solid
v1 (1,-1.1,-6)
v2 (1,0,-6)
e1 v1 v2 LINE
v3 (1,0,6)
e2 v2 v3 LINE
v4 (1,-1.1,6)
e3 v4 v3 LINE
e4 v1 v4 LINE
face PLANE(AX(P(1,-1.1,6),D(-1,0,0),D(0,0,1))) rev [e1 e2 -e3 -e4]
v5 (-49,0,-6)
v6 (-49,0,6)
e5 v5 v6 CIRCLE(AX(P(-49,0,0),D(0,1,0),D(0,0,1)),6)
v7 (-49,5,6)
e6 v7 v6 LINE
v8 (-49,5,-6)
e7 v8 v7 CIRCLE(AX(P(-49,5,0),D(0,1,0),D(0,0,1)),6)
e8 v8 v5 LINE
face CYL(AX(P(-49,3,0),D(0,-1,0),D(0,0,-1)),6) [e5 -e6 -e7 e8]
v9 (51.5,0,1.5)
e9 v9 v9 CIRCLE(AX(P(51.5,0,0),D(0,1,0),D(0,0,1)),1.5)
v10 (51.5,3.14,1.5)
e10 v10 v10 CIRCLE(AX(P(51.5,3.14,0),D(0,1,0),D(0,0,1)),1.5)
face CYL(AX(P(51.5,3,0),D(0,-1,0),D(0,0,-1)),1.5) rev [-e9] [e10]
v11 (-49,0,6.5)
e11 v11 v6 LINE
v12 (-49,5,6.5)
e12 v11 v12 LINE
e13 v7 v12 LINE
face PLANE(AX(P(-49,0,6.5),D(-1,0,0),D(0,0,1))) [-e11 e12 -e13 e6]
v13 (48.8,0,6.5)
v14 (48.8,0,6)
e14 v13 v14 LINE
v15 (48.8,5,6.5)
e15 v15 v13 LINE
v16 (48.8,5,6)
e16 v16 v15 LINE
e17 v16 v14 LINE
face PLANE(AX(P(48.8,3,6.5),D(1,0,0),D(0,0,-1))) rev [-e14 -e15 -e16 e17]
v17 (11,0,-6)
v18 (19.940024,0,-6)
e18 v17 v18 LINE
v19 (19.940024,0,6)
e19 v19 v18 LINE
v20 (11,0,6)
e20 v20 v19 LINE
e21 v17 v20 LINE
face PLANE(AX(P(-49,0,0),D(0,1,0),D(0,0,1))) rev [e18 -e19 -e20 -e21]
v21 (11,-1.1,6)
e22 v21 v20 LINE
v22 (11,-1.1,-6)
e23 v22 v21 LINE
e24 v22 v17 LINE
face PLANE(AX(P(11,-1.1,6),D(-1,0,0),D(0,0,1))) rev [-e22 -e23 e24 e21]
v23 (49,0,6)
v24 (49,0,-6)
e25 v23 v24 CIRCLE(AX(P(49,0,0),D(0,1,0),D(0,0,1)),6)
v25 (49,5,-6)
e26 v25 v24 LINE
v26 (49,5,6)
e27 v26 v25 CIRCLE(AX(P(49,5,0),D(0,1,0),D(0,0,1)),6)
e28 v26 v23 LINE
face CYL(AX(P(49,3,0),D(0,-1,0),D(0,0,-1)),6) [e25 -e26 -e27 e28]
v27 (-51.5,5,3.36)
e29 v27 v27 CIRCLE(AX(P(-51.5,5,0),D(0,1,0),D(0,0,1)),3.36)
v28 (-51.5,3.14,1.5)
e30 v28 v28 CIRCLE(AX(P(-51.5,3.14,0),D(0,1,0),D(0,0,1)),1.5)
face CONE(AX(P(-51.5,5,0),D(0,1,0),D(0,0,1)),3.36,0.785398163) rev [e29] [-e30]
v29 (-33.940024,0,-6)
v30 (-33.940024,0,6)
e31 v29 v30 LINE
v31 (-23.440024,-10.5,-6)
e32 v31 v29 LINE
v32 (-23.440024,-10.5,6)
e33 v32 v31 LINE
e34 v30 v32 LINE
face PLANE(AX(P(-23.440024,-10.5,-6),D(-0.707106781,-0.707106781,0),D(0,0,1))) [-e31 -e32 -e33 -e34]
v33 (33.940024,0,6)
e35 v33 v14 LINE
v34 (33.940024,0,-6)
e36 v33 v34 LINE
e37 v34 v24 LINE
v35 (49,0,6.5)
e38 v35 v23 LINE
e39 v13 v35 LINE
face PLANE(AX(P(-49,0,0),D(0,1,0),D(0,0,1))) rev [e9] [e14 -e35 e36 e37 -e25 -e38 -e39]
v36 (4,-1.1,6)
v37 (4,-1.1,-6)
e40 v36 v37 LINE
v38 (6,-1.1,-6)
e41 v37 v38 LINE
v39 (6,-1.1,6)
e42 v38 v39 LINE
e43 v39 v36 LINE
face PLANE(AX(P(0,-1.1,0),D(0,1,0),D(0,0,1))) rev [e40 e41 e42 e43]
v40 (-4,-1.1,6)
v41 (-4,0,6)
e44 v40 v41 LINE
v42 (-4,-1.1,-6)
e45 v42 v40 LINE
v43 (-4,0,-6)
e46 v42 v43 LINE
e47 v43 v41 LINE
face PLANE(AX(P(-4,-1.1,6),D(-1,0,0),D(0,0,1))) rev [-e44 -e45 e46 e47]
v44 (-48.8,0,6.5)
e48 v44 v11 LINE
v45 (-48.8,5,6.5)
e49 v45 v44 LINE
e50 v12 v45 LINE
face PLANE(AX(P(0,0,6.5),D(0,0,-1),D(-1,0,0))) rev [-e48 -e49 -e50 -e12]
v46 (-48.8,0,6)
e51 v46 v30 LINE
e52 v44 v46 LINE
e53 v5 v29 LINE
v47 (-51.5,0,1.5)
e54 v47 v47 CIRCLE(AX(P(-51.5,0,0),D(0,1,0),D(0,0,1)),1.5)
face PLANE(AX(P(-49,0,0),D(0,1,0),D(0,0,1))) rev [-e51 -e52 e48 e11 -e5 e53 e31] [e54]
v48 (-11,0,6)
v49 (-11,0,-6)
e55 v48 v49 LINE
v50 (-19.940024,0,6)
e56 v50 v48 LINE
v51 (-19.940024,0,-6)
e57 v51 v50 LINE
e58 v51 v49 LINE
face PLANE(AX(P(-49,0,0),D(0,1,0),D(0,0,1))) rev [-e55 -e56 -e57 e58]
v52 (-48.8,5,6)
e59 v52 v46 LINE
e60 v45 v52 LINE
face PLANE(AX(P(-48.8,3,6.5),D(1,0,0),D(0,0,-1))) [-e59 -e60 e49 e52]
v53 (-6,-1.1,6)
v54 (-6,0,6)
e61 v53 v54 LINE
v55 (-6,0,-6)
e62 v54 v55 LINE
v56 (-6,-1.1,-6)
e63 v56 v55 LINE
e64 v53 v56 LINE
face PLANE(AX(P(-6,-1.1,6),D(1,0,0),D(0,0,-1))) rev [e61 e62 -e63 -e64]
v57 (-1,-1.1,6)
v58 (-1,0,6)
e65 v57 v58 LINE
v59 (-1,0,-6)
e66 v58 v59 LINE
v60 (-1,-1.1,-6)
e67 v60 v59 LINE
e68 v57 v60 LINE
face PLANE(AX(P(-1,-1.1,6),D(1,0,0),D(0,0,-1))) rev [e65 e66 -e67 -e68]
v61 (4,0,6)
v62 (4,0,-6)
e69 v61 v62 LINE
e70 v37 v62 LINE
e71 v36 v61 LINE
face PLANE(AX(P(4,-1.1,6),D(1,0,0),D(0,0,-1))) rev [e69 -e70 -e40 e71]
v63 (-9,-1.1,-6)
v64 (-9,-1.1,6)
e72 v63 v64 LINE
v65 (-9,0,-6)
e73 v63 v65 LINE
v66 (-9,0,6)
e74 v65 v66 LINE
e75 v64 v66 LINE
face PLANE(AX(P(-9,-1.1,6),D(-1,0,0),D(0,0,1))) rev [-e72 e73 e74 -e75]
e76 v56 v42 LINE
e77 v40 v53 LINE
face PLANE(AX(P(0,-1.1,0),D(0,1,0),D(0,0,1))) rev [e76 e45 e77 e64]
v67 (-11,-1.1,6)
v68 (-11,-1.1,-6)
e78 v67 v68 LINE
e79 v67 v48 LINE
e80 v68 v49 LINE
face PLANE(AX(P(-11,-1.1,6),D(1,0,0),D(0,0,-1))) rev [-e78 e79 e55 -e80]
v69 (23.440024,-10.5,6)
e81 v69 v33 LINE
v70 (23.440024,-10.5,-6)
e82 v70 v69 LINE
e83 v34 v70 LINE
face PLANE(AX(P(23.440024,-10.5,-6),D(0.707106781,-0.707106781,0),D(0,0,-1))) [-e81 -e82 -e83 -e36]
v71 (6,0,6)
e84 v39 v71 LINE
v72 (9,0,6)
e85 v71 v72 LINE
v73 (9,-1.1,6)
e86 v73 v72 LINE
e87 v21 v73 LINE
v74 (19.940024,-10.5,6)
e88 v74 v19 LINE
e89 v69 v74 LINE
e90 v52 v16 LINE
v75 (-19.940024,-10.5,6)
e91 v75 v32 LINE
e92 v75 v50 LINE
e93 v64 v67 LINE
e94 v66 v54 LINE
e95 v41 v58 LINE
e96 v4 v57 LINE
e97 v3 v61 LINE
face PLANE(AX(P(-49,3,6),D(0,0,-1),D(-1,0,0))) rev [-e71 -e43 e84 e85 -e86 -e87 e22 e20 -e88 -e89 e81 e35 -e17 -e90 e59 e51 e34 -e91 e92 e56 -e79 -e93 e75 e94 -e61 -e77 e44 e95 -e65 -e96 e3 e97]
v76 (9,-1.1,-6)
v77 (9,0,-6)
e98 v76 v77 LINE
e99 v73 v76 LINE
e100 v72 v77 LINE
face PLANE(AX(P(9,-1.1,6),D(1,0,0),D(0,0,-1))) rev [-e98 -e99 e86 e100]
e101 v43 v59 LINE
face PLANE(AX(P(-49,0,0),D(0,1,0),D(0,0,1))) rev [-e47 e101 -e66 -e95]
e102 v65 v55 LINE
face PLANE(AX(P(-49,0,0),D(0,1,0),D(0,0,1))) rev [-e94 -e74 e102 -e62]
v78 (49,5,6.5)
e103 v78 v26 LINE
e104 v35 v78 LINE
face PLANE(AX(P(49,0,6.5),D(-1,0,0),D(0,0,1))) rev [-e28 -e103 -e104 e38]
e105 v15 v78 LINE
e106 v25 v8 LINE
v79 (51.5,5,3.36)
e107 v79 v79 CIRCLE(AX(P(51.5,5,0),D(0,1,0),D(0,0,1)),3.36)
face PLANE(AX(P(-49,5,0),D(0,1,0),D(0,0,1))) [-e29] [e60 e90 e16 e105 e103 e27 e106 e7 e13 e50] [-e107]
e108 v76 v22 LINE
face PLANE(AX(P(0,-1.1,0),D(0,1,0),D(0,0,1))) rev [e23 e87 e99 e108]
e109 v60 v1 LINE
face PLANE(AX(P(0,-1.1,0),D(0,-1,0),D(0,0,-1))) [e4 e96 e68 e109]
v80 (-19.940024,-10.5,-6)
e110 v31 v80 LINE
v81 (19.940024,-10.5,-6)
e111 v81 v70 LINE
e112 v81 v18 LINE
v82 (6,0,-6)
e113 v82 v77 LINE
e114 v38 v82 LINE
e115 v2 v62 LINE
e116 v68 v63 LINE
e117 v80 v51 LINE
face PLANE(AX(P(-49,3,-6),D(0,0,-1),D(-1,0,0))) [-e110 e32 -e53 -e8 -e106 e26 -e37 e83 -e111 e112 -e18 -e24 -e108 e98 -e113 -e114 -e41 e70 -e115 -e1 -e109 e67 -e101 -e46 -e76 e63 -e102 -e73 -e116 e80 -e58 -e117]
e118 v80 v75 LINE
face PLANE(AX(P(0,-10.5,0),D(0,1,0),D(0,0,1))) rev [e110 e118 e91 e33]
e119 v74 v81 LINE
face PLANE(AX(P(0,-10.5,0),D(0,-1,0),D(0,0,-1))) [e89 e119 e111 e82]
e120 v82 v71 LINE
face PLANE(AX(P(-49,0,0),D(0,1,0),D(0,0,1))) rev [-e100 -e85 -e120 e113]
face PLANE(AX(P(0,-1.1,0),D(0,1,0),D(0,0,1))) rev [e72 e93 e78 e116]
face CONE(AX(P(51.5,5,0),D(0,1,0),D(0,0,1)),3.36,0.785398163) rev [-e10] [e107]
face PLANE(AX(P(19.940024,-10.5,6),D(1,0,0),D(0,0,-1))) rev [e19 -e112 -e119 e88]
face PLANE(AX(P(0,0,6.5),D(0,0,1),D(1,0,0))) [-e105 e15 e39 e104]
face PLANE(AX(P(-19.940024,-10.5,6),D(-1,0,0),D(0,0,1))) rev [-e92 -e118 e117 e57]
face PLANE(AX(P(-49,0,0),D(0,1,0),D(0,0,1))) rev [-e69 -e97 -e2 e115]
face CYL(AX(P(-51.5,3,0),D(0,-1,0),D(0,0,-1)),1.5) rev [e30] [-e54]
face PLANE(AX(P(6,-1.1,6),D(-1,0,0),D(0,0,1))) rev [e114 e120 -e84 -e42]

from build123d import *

# Parameters (mm, degrees)
SKETCH1_R                     = 1.5
BOSS_EXTRUDE1_DEPTH           = 3
SKETCH4_W                     = 3.5
SKETCH4_H                     = 12
BOSS_EXTRUDE3_DEPTH           = 10.5
SKETCH5_W                     = 2
SKETCH5_H                     = 12
BOSS_EXTRUDE4_DEPTH           = 1.1
SKETCH6_W                     = 0.2
SKETCH6_H                     = 3
BOSS_EXTRUDE5_DEPTH           = 0.5
CHAMFER1_SIZE                 = 10.5
F_3_0MM_DOWEL_HOLE1_D         = 3
F_3_0MM_DOWEL_HOLE1_DEPTH     = 13.5
SKETCH10_R                    = 1.5
BOSS_EXTRUDE6_DEPTH           = 2
CSK_FOR_M3_SFHCS1_D           = 3
CSK_FOR_M3_SFHCS1_DEPTH       = 31.098709071
CSK_FOR_M3_SFHCS1_CSINK_D     = 6.72
CSK_FOR_M3_SFHCS1_CSINK_ANGLE = 90
CSK_FOR_M3_SFHCS1_TIP         = 0.901290929


with BuildPart() as part:
    # Sketch1 → Boss-Extrude1 (new body)
    with BuildSketch(Plane(origin=(0, 0, 0), x_dir=(1, 0, 0), z_dir=(0, 1, 0))):
        with BuildLine():
            Line((-49, 6), (49, 6))
            ThreePointArc((49, 6), (55, 0), (49, -6))
            Line((49, -6), (-49, -6))
            ThreePointArc((-49, -6), (-55, 0), (-49, 6))
        make_face()
        with Locations(Location((-51.5, 0, 0), (0, 0, 270))):
            Circle(SKETCH1_R, mode=Mode.SUBTRACT)
        with Locations(Location((51.5, 0, 0), (0, 0, 270))):
            Circle(SKETCH1_R, mode=Mode.SUBTRACT)
    extrude(amount=BOSS_EXTRUDE1_DEPTH)

    # Sketch4 → Boss-Extrude3 (add)
    with BuildSketch(Plane.XZ):
        with Locations((-21.690023983, 0)):
            Rectangle(SKETCH4_W, SKETCH4_H)
        with Locations((21.690023983, 0)):
            Rectangle(SKETCH4_W, SKETCH4_H)
    extrude(amount=BOSS_EXTRUDE3_DEPTH)

    # Sketch5 → Boss-Extrude4 (add)
    with BuildSketch(Plane.XZ):
        with Locations((5, 0)):
            Rectangle(SKETCH5_W, SKETCH5_H)
        Rectangle(SKETCH5_W, SKETCH5_H)
        with Locations((10, 0)):
            Rectangle(SKETCH5_W, SKETCH5_H)
        with Locations((-5, 0)):
            Rectangle(SKETCH5_W, SKETCH5_H)
        with Locations((-10, 0)):
            Rectangle(SKETCH5_W, SKETCH5_H)
    extrude(amount=BOSS_EXTRUDE4_DEPTH)

    # Sketch6 → Boss-Extrude5 (add)
    with BuildSketch(Plane.XY.offset(6)):
        with Locations((48.9, 1.5)):
            Rectangle(SKETCH6_W, SKETCH6_H)
        with Locations((-48.9, 1.5)):
            Rectangle(SKETCH6_W, SKETCH6_H)
    extrude(amount=BOSS_EXTRUDE5_DEPTH)

    # Chamfer1
    chamfer1_edges = [part.edges().sort_by_distance(p)[0] for p in [
        (23.440023983, 0, 0),
        (-23.440023983, 0, 0),
    ]]
    chamfer(chamfer1_edges, length=CHAMFER1_SIZE - 0.0001)  # a hair under: the kernel refuses the full size

    # Ø3.0mm Dowel Hole1
    with Locations(Plane(origin=(0, 3, 0), x_dir=(1, 0, 0), z_dir=(0, 1, 0))):
        with Locations((-51.5, 0), (51.5, 0)):
            Hole(F_3_0MM_DOWEL_HOLE1_D / 2, depth=F_3_0MM_DOWEL_HOLE1_DEPTH)

    # Sketch10 → Boss-Extrude6 (add)
    with BuildSketch(Plane(origin=(0, 3, 0), x_dir=(1, 0, 0), z_dir=(0, 1, 0))):
        with BuildLine():
            Line((-49, -6), (-49, -6.5))
            Line((-49, -6.5), (-48.8, -6.5))
            Line((-48.8, -6.5), (-48.8, -6))
            Line((-48.8, -6), (48.8, -6))
            Line((48.8, -6), (48.8, -6.5))
            Line((48.8, -6.5), (49, -6.5))
            Line((49, -6.5), (49, -6))
            ThreePointArc((49, -6), (55, 0), (49, 6))
            Line((49, 6), (-49, 6))
            ThreePointArc((-49, 6), (-55, 0), (-49, -6))
        make_face()
        with Locations(Location((-51.5, 0, 0), (0, 0, 270))):
            Circle(SKETCH10_R, mode=Mode.SUBTRACT)
        with Locations(Location((51.5, 0, 0), (0, 0, 270))):
            Circle(SKETCH10_R, mode=Mode.SUBTRACT)
    extrude(amount=BOSS_EXTRUDE6_DEPTH)

    # CSK for M3 SFHCS1
    with Locations(Plane(origin=(0, 5, 0), x_dir=(1, 0, 0), z_dir=(0, 1, 0))):
        with Locations((51.5, 0), (-51.5, 0)):
            CounterSinkHole(CSK_FOR_M3_SFHCS1_D / 2, CSK_FOR_M3_SFHCS1_CSINK_D / 2, depth=CSK_FOR_M3_SFHCS1_DEPTH, counter_sink_angle=CSK_FOR_M3_SFHCS1_CSINK_ANGLE)
            with Locations((0, 0, -(CSK_FOR_M3_SFHCS1_DEPTH + CSK_FOR_M3_SFHCS1_TIP / 2))):  # 118° drill point
                Cone(0, CSK_FOR_M3_SFHCS1_D / 2, CSK_FOR_M3_SFHCS1_TIP, mode=Mode.SUBTRACT)


solid = part.part
